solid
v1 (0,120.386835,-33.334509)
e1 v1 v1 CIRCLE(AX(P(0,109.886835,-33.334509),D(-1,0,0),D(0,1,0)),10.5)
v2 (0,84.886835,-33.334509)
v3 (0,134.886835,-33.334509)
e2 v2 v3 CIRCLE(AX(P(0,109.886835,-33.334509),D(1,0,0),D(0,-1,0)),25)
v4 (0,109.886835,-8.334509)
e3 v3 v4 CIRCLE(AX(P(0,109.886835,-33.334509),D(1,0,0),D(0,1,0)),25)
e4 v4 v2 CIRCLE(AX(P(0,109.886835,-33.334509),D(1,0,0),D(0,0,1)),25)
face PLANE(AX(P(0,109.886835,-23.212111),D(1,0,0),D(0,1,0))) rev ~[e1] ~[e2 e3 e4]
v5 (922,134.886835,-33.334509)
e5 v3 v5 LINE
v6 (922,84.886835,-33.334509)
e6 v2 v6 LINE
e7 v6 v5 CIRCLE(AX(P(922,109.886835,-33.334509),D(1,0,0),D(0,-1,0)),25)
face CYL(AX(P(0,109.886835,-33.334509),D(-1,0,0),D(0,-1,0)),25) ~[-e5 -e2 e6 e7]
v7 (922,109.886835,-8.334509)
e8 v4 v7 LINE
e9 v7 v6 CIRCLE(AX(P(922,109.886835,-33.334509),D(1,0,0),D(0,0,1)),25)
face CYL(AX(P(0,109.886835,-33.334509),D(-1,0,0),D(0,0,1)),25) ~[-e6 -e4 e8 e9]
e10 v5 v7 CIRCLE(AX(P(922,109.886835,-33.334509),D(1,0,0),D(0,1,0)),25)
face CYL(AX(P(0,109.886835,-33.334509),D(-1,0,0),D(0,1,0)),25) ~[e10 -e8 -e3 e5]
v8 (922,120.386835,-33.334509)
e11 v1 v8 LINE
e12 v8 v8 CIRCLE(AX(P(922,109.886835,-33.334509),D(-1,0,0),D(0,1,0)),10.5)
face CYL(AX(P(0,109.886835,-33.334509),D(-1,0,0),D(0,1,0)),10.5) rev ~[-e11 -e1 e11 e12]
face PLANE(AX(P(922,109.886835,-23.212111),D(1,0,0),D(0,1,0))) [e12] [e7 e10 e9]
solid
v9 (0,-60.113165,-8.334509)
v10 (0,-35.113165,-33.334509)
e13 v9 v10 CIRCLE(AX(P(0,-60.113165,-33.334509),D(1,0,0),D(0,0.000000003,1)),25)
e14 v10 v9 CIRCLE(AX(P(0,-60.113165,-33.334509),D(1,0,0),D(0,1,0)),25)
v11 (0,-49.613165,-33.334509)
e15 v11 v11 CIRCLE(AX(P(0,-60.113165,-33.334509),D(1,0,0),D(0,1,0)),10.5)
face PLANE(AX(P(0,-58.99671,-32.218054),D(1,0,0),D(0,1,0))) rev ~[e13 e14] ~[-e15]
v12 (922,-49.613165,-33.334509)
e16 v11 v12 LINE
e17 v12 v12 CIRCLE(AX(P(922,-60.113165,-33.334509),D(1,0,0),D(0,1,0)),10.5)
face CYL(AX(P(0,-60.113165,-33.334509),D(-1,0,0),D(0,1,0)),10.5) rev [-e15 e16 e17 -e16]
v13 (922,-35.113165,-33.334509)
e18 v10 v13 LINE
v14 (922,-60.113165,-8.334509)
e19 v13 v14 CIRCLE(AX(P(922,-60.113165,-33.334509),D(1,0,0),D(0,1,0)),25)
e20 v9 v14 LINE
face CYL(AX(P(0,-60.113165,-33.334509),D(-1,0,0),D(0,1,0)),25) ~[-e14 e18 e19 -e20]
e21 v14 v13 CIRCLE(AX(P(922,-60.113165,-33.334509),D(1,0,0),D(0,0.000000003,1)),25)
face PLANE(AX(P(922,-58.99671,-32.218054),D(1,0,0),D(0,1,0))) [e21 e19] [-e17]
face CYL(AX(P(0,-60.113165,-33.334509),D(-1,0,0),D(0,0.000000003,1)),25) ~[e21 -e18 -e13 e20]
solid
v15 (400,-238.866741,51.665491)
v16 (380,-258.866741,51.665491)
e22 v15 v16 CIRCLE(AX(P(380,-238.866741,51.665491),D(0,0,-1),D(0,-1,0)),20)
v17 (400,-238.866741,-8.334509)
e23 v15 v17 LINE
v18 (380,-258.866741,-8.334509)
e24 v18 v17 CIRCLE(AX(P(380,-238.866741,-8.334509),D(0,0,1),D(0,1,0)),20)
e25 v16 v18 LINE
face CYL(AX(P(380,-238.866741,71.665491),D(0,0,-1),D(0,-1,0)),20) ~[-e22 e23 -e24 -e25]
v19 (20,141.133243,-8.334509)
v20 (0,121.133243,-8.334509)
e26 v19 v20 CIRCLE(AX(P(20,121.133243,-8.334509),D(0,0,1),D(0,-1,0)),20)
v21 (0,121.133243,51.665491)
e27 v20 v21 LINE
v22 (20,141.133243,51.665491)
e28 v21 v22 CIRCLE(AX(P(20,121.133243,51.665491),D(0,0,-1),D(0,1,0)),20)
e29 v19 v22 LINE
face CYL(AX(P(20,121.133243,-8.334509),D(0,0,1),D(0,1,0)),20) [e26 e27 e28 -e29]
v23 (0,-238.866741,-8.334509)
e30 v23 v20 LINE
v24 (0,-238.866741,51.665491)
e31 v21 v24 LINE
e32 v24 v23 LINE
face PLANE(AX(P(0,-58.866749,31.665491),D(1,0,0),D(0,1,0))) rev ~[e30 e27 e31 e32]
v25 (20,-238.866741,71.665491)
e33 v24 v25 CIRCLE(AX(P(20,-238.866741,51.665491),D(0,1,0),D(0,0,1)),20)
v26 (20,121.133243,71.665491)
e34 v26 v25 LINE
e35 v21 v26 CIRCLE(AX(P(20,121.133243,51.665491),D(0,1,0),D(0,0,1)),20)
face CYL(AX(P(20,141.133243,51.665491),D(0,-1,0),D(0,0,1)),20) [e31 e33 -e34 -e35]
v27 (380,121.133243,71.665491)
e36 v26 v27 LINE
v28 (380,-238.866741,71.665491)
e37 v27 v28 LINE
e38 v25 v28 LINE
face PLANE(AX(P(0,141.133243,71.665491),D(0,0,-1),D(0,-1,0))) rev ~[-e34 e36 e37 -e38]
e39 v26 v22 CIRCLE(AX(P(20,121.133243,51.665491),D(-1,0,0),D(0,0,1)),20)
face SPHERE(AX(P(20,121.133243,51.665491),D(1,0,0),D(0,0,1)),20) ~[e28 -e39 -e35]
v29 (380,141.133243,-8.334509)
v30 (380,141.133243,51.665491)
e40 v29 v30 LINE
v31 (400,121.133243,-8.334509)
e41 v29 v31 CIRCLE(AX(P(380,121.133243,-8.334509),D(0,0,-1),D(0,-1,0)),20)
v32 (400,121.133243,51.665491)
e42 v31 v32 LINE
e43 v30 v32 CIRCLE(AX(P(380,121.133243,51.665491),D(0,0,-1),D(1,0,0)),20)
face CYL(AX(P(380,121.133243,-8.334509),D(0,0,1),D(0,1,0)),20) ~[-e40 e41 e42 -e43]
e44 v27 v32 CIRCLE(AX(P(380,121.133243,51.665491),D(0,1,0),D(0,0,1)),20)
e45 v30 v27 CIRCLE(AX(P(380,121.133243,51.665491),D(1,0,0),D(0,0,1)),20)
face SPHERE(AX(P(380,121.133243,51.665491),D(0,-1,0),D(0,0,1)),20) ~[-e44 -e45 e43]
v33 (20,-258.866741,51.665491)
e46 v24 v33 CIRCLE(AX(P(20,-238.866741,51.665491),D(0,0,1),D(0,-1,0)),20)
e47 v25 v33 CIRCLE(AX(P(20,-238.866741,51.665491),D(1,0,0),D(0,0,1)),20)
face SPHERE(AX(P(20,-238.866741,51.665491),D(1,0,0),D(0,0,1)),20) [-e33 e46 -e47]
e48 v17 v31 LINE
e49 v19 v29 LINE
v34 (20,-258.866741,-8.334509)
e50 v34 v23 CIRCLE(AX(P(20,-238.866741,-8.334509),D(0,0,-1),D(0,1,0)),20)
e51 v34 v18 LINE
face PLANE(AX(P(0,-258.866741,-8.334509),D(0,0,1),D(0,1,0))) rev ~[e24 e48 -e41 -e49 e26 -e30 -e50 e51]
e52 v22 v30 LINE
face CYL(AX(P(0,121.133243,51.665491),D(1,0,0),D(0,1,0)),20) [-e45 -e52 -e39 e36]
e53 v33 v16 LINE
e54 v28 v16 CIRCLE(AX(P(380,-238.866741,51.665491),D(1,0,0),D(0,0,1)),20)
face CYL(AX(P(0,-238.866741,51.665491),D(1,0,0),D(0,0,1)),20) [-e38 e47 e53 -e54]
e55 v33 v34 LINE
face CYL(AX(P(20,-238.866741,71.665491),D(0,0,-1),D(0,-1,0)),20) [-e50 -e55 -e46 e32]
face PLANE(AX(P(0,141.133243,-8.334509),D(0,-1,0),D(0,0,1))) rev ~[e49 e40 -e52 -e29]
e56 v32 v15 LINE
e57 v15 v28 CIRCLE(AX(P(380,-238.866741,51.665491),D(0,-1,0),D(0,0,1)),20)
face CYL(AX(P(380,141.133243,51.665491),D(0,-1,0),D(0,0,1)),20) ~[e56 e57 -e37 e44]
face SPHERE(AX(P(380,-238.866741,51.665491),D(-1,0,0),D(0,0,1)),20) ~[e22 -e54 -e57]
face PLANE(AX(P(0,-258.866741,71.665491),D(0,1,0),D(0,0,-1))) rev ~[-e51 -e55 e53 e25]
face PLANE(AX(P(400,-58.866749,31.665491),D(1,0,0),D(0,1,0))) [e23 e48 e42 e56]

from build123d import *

# Parameters (mm, degrees)
F1_DEPTH = 400
F0_R     = 10.5
F2_DEPTH = 922
F3_R     = 20


# Not quite as in the source:
# - a feature names something its author has since deleted; it is built from what else it names


with BuildPart() as f1:
    # F0 (on Right) → F1 (new body)
    with BuildSketch(Plane.YZ):
        Polygon((-258.8667411456, -8.3345091114), (-60.1131648569, -8.3345091114), (109.8868350748, -8.3345091114), (141.1332431091, -8.3345091114), (141.1332431091, 71.6654908886), (-258.8667411456, 71.6654908886), align=None)
    extrude(amount=F1_DEPTH)

    # F3
    f3_edges = [f1.edges().sort_by_distance(p)[0] for p in [
        (200, -258.866741, 71.665491),
        (400, -58.866749, 71.665491),
        (200, 141.133243, 71.665491),
        (0, -58.866749, 71.665491),
        (400, 141.133243, 31.665491),
        (0, 141.133243, 31.665491),
        (400, -258.866741, 31.665491),
        (0, -258.866741, 31.665491),
    ]]
    fillet(f3_edges, radius=F3_R)


with BuildPart() as f2:
    # F0 (on Right) → F2 (new body)
    with BuildSketch(Plane.YZ):
        with BuildLine():
            ThreePointArc((-60.1131648569, -8.3345091114), (-77.790834479, -51.0121786169), (-35.1131649252, -33.3345091114))
            ThreePointArc((-35.1131649252, -33.3345091114), (-42.4354953714, -15.6568396059), (-60.1131648569, -8.3345091114))
        make_face()
        with Locations((-60.1131649252, -33.3345091114)):
            Circle(F0_R, mode=Mode.SUBTRACT)
    extrude(amount=F2_DEPTH)


with BuildPart() as f2b:
    # F0 (on Right) → F2, piece 2 (new body)
    with BuildSketch(Plane.YZ):
        with BuildLine():
            ThreePointArc((109.8868350748, -8.3345091114), (92.2091655451, -15.6568395818), (84.8868350748, -33.3345091114))
            Line((84.8868350748, -33.3345091114), (99.3868350748, -33.3345091114))
            ThreePointArc((99.3868350748, -33.3345091114), (109.8868350748, -22.8345091114), (120.3868350748, -33.3345091114))
            Line((120.3868350748, -33.3345091114), (134.8868350748, -33.3345091114))
            ThreePointArc((134.8868350748, -33.3345091114), (127.5645046045, -15.6568395818), (109.8868350748, -8.3345091114))
        make_face()
        with BuildLine():
            Line((99.3868350748, -33.3345091114), (84.8868350748, -33.3345091114))
            ThreePointArc((84.8868350748, -33.3345091114), (109.8868350748, -58.3345091114), (134.8868350748, -33.3345091114))
            Line((134.8868350748, -33.3345091114), (120.3868350748, -33.3345091114))
            ThreePointArc((120.3868350748, -33.3345091114), (109.8868350748, -43.8345091114), (99.3868350748, -33.3345091114))
        make_face()
    extrude(amount=F2_DEPTH)


solid = Compound([f1.part, f2.part, f2b.part])
